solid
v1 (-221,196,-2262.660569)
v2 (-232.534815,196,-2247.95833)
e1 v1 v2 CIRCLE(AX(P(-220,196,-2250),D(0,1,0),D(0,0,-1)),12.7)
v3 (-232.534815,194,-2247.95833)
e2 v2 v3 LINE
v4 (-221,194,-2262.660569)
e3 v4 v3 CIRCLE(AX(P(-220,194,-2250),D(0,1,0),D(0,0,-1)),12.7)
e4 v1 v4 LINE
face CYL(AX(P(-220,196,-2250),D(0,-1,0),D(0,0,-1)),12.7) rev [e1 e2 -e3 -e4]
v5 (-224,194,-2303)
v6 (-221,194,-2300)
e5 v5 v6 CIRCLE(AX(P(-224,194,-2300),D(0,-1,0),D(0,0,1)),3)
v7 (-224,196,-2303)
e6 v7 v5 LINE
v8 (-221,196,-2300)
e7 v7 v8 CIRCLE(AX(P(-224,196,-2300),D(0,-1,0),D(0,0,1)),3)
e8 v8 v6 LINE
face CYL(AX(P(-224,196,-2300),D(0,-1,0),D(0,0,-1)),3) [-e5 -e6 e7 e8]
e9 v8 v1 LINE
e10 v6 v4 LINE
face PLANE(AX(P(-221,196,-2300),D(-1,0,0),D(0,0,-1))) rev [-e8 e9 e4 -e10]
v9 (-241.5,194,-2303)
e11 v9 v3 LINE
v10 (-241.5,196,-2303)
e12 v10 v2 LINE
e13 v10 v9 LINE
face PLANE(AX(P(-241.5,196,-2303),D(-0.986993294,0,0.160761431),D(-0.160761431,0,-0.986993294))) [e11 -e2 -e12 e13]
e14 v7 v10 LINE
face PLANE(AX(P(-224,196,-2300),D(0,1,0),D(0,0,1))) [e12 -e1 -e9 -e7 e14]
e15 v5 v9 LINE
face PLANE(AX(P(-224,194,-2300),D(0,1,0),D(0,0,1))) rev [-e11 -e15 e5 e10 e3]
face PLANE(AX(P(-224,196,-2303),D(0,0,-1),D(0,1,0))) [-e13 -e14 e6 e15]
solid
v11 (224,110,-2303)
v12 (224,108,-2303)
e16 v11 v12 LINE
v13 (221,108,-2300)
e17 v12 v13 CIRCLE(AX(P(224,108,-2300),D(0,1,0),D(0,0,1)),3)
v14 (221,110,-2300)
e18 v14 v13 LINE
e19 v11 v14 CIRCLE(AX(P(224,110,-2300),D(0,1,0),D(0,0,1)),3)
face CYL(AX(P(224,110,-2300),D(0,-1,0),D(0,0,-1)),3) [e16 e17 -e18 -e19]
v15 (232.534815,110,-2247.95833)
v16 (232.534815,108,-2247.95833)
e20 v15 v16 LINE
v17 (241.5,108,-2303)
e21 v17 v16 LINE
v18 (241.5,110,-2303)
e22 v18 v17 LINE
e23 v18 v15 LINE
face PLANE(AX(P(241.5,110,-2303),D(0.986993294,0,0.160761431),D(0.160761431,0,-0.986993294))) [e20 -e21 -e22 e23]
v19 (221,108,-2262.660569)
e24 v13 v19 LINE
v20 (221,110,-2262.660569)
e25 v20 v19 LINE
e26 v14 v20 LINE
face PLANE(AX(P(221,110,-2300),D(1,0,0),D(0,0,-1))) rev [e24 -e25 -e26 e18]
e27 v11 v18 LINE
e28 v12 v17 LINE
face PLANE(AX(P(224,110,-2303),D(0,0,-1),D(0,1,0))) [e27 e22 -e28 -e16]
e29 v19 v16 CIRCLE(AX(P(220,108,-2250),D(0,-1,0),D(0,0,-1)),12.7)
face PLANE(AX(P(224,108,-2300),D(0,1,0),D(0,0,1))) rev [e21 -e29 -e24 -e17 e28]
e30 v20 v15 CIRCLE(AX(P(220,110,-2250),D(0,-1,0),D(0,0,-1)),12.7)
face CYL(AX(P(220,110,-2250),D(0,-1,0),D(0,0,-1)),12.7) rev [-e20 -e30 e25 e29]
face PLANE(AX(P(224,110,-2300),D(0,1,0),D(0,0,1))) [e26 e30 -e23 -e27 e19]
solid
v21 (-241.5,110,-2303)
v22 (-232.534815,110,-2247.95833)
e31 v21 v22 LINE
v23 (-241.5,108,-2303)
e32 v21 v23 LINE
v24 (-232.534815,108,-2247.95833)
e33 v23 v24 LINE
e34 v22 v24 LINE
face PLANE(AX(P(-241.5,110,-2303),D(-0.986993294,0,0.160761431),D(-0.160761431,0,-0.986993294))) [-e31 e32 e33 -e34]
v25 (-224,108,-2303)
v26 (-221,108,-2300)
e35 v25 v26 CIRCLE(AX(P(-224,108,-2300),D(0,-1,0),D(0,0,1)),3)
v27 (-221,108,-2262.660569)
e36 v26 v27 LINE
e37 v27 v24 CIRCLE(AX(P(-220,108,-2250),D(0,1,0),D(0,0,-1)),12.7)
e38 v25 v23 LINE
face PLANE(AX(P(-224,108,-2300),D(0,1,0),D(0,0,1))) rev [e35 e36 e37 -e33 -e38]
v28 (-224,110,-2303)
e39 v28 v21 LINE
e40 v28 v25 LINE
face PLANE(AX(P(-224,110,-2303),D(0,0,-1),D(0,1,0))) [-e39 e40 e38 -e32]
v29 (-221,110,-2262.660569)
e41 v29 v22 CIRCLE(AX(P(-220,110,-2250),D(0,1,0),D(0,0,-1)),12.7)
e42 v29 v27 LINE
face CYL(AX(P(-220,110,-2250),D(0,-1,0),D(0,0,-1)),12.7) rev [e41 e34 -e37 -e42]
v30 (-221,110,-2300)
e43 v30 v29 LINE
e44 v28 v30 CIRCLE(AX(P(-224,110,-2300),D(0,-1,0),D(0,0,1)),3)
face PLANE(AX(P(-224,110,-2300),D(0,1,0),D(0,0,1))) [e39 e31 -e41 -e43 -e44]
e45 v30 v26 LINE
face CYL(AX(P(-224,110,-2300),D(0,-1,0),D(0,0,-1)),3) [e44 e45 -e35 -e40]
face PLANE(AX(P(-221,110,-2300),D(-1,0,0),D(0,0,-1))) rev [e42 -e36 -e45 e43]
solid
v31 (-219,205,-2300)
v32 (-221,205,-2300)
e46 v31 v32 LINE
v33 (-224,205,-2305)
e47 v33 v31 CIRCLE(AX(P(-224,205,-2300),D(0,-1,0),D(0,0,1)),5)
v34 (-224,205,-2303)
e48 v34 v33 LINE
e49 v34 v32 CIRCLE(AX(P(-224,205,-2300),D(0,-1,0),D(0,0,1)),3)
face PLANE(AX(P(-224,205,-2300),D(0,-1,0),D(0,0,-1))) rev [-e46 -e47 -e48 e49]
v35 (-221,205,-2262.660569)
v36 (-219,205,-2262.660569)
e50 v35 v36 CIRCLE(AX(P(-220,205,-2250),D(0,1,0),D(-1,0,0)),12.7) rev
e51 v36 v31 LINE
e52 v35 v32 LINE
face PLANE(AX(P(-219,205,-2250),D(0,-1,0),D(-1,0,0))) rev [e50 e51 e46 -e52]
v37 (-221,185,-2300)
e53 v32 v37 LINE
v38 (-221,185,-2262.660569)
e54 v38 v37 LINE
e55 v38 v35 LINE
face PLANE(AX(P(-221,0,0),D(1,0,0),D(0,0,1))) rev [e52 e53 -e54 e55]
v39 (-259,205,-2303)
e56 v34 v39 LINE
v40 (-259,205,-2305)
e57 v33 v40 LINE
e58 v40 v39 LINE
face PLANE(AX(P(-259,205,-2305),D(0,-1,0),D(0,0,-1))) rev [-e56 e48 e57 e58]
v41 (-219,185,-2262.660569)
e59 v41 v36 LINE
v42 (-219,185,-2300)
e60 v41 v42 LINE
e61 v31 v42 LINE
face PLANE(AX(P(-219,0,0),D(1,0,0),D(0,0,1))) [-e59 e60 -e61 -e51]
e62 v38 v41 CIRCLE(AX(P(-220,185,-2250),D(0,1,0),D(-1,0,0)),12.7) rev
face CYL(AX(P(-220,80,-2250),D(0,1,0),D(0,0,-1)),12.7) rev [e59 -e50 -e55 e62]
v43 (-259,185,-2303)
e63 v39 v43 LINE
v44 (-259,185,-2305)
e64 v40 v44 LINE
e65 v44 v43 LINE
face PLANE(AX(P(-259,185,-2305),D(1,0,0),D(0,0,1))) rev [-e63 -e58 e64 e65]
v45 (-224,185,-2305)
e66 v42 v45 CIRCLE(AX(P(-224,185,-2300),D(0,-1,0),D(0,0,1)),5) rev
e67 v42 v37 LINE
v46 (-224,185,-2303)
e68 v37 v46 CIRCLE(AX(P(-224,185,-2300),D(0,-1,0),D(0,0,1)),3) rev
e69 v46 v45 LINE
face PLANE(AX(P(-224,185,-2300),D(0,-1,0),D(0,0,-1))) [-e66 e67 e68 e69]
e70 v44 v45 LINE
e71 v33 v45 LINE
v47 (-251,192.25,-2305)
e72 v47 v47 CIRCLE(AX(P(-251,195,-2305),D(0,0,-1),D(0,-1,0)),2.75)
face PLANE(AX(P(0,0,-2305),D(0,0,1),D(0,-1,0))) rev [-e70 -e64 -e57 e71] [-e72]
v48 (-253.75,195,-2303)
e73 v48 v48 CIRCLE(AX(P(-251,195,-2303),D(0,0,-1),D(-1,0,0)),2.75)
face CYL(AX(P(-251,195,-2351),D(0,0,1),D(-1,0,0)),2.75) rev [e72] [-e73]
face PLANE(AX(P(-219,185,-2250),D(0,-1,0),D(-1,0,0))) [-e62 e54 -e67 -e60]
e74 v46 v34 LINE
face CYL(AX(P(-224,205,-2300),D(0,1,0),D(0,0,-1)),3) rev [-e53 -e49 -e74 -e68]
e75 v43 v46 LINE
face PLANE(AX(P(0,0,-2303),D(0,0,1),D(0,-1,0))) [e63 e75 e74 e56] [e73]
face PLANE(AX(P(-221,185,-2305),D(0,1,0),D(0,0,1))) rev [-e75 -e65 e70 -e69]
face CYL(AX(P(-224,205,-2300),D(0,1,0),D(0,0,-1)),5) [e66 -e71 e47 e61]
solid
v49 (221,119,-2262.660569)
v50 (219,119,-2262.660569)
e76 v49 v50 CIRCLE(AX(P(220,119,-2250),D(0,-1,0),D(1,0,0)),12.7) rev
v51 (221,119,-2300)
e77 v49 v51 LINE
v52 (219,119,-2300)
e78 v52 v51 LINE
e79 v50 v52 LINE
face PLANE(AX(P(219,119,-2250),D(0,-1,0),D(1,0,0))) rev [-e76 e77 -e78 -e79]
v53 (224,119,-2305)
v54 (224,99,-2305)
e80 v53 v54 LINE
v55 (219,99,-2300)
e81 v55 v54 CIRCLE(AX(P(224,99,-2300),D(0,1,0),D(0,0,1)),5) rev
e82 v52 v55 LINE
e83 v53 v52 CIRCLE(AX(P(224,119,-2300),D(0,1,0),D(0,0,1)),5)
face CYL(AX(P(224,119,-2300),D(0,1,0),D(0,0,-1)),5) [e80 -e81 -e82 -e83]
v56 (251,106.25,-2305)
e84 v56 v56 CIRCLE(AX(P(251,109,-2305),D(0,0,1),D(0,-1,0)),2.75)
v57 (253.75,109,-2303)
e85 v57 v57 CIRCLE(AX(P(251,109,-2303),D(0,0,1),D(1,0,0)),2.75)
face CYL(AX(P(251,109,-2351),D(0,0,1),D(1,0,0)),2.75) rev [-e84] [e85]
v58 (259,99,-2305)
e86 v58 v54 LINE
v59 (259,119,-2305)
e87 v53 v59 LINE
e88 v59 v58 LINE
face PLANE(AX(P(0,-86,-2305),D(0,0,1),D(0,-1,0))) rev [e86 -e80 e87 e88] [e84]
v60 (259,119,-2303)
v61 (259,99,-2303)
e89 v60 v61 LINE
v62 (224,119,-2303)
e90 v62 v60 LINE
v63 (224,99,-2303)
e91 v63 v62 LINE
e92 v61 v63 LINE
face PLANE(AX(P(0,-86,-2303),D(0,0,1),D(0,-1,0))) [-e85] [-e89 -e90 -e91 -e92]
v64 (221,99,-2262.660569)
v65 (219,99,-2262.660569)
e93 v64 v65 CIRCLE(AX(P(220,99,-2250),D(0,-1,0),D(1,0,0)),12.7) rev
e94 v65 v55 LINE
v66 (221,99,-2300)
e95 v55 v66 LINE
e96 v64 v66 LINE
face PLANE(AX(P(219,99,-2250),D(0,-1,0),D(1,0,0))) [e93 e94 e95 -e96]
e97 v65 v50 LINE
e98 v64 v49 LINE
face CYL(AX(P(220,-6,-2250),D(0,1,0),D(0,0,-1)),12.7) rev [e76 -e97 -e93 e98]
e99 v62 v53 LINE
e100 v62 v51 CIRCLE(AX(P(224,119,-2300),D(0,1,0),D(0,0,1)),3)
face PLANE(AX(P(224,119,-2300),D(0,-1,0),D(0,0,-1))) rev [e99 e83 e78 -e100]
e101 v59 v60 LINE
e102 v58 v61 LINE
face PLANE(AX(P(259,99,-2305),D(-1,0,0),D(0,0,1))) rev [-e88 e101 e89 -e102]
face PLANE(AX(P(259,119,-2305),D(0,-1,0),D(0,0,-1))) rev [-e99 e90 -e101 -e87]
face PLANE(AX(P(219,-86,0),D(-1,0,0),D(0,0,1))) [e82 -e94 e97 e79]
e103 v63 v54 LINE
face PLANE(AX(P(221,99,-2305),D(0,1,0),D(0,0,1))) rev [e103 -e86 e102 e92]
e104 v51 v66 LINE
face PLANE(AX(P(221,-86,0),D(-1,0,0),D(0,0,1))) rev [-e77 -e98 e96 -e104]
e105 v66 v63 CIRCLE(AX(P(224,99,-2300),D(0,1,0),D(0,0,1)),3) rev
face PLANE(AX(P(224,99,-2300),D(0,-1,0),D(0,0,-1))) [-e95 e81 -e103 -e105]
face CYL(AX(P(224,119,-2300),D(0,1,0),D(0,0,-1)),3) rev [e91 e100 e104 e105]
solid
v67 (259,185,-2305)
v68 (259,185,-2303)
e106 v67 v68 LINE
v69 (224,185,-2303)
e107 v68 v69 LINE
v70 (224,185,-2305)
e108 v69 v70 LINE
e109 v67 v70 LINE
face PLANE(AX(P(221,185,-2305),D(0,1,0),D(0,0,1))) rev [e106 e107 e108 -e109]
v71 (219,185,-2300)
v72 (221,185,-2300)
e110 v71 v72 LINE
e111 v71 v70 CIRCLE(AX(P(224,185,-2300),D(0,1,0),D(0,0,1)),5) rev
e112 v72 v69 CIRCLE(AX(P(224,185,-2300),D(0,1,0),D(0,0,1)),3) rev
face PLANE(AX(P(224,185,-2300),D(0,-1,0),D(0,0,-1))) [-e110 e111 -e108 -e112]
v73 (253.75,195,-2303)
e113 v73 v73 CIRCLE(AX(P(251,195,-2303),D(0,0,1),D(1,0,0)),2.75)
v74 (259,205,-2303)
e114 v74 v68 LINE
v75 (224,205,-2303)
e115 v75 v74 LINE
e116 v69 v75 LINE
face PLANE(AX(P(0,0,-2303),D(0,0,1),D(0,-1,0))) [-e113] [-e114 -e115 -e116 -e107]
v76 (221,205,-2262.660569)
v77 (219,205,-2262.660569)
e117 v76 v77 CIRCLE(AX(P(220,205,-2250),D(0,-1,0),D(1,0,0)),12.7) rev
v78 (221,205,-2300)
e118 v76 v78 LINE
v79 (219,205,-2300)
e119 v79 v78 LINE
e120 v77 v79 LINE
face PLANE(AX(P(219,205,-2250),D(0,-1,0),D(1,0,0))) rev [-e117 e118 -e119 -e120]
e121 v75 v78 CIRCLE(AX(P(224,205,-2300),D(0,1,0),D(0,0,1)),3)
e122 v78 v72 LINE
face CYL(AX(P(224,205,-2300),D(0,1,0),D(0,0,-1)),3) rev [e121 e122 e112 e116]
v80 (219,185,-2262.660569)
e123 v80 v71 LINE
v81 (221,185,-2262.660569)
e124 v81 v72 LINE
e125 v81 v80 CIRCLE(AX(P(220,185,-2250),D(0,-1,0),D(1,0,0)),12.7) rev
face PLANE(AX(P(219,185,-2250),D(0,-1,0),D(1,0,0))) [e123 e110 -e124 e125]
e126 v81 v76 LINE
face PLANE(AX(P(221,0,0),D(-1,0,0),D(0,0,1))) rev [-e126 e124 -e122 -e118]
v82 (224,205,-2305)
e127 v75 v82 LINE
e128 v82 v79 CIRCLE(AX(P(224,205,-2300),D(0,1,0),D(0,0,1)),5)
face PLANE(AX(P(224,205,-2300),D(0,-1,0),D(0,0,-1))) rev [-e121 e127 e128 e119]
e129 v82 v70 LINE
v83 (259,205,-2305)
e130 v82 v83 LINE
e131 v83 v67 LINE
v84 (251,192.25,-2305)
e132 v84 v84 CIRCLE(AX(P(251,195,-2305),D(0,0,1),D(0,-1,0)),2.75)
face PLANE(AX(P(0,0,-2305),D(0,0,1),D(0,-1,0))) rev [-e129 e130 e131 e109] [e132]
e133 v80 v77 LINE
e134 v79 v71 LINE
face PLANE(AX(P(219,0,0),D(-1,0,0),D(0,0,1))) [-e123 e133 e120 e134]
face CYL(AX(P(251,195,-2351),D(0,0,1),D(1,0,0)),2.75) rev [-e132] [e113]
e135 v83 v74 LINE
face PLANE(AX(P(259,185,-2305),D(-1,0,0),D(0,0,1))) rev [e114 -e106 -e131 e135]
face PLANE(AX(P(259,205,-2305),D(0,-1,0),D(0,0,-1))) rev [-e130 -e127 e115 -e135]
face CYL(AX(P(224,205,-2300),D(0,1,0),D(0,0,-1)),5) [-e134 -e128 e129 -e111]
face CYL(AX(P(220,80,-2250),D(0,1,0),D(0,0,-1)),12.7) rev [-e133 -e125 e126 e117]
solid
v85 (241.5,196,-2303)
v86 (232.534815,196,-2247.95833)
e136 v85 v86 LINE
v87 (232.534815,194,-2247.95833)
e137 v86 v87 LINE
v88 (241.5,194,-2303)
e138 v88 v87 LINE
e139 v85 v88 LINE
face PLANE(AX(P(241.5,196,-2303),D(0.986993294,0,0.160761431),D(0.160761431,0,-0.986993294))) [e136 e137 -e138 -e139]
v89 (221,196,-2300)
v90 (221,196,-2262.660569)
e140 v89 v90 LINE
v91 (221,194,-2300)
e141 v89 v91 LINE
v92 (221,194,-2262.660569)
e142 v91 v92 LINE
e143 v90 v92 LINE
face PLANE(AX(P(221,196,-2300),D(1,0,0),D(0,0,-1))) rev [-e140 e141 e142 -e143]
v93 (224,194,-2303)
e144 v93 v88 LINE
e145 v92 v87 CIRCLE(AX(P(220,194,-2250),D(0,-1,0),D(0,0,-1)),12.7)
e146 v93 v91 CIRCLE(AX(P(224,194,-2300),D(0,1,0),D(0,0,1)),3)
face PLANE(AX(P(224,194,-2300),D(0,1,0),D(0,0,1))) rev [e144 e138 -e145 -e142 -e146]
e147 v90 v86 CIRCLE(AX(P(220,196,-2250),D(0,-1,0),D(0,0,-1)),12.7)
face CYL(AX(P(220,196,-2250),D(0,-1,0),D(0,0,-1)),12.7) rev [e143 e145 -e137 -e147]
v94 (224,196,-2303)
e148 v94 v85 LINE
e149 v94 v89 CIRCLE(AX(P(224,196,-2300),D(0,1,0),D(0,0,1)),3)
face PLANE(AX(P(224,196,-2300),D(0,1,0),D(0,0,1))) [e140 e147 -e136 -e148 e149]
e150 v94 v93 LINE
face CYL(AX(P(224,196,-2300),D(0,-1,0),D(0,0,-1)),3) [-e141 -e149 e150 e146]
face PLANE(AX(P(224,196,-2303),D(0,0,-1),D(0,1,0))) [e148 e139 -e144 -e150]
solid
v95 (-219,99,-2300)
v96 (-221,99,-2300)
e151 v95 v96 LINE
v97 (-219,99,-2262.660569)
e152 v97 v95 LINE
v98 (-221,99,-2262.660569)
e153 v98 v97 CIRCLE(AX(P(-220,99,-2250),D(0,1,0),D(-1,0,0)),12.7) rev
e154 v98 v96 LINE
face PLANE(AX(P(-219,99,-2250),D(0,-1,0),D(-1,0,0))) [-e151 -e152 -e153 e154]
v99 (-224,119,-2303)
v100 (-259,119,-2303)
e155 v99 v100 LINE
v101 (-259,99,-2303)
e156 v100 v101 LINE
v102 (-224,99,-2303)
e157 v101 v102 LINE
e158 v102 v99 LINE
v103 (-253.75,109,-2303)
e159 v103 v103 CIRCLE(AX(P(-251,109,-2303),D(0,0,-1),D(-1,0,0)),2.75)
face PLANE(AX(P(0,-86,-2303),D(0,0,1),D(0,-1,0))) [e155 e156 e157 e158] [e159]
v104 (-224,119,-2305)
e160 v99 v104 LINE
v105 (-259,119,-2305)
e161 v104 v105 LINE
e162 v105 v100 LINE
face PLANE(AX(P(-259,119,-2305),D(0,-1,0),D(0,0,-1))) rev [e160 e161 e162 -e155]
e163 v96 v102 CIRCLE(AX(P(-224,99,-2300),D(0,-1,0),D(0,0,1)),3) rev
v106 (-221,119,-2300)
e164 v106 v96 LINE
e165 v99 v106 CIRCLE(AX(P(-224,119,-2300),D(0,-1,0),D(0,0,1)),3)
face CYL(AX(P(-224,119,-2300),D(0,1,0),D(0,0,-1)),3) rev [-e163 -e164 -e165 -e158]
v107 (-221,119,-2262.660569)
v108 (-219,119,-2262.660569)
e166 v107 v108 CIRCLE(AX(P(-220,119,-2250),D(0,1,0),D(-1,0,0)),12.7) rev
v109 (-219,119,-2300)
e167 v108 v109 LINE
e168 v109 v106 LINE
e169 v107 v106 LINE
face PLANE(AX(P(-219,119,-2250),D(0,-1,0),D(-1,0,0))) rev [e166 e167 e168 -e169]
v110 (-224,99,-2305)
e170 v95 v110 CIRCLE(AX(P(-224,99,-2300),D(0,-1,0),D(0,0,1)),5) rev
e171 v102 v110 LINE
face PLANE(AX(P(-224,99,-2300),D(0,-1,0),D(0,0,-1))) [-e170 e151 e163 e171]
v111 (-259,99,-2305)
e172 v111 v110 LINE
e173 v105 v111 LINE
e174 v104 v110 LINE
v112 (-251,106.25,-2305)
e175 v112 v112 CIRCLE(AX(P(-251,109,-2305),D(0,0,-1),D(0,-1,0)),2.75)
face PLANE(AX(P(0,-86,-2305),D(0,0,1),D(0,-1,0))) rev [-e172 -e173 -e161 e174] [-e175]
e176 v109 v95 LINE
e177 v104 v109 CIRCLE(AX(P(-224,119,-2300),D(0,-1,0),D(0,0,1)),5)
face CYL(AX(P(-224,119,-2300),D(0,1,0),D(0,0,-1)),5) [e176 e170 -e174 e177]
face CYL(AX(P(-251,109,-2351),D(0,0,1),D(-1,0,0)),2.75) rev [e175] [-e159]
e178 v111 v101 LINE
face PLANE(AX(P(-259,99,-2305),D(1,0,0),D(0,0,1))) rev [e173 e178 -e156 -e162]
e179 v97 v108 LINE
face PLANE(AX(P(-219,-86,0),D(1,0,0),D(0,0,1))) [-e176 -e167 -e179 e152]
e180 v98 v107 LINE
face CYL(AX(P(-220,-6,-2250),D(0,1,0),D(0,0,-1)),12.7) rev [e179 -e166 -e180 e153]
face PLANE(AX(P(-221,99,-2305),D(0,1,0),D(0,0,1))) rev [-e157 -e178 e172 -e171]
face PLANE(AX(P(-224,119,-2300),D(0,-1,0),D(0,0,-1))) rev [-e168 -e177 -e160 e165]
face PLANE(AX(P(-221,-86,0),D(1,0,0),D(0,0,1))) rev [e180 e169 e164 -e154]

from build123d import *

# Parameters (mm, degrees)
SKETCH3_W                = 50
SKETCH3_H                = 20
BASE_FLANGE1_DEPTH       = 2
EDGE_FLANGE1_DEPTH       = 20
BOSS_EXTRUDE2_DEPTH      = 1
SKETCH19_R               = 2.75
CUT_EXTRUDE1_DEPTH       = 48
INDENT1_START            = 185
INDENT1_DEPTH            = 20
BODY_DELETE_KEEP_START   = 185
BODY_DELETE_KEEP_1_DEPTH = 20
LPATTERN1_COUNT          = 2
LPATTERN1_PITCH          = 86


# Read off the part's stored shape, not the designer's step: Indent1, Body-Delete/Keep 1
# Sheet-metal steps are written as plain solids
with BuildPart() as part:
    # Sketch3 → Base-Flange1 (new body)
    with BuildSketch(Plane(origin=(221, 0, 0), x_dir=(0, 0, -1), z_dir=(1, 0, 0))):
        with Locations((2275, 195)):
            Rectangle(SKETCH3_W, SKETCH3_H)
    extrude(amount=-BASE_FLANGE1_DEPTH)

    # Edge-Flange1 section (across the edge) → Edge-Flange1 (add)
    with BuildSketch(Plane(origin=(221, 185, -2303), x_dir=(0, 0, 1), z_dir=(0, 1, 0))):
        with BuildLine():
            Line((-2, 3), (-2, 38))
            Line((-2, 38), (0, 38))
            Line((0, 38), (0, 3))
            ThreePointArc((0, 3), (0.878679656, 0.878679656), (3, 0))
            Line((3, 0), (3, -2))
            ThreePointArc((3, -2), (-0.535533906, -0.535533906), (-2, 3))
        make_face()
    extrude(amount=EDGE_FLANGE1_DEPTH)

    # Sketch19 → Cut-Extrude1 (cut)
    with BuildSketch(Plane.XY.offset(-2303)):
        with Locations((251, 195)):
            Circle(SKETCH19_R)
    extrude(amount=-CUT_EXTRUDE1_DEPTH, mode=Mode.SUBTRACT)

    # Indent1 outline → Indent1 (cut)
    with BuildSketch(Plane(origin=(0, 0, 0), x_dir=(1, 0, 0), z_dir=(0, 1, 0)).offset(INDENT1_START)):
        with BuildLine():
            Line((221, 2261.356055653), (221, 2262.660568708))
            ThreePointArc((221, 2262.660568708), (220, 2262.7), (219, 2262.660568708))
            Line((219, 2262.660568708), (219, 2261.356055653))
            ThreePointArc((219, 2261.356055653), (220, 2261.4), (221, 2261.356055653))
        make_face()
    extrude(amount=INDENT1_DEPTH, mode=Mode.SUBTRACT)

    # Body-Delete/Keep 1 outline → Body-Delete/Keep 1 (cut)
    with BuildSketch(Plane(origin=(0, 0, 0), x_dir=(1, 0, 0), z_dir=(0, 1, 0)).offset(BODY_DELETE_KEEP_START)):
        with BuildLine():
            ThreePointArc((221, 2261.356055653), (220, 2261.4), (219, 2261.356055653))
            Line((219, 2261.356055653), (219, 2250))
            Line((219, 2250), (221, 2250))
            Line((221, 2250), (221, 2261.356055653))
        make_face()
    extrude(amount=BODY_DELETE_KEEP_1_DEPTH, mode=Mode.SUBTRACT)


with BuildPart() as body_2:
    # Sketch11 → Boss-Extrude2 (new, symmetric)
    with BuildSketch(Plane(origin=(0, 195, 0), x_dir=(1, 0, 0), z_dir=(0, 1, 0))):
        with BuildLine():
            Line((221, 2300), (221, 2262.660568708))
            ThreePointArc((221, 2262.660568708), (229.991834673, 2257.839211686), (232.534814834, 2247.958329831))
            Line((232.534814834, 2247.958329831), (241.5, 2303))
            Line((241.5, 2303), (224, 2303))
            ThreePointArc((224, 2303), (221.878679656, 2302.121320344), (221, 2300))
        make_face()
    extrude(amount=BOSS_EXTRUDE2_DEPTH, both=True)


with BuildPart() as lpattern1_1:
    # LPattern1: pattern copy
    add(part.part.moved(Location(Vector(0, -1, 0) * (1 * LPATTERN1_PITCH))))


with BuildPart() as lpattern1_2:
    # LPattern1: pattern copy
    add(body_2.part.moved(Location(Vector(0, -1, 0) * (1 * LPATTERN1_PITCH))))


with BuildPart() as body_5:
    # Mirror1: mirrored copy
    add(part.part.mirror(Plane(origin=(0, 0, 0), x_dir=(0, 0, 1), z_dir=(1, 0, 0))))


with BuildPart() as body_6:
    # Mirror1 2: mirrored copy
    add(body_2.part.mirror(Plane(origin=(0, 0, 0), x_dir=(0, 0, 1), z_dir=(1, 0, 0))))


with BuildPart() as body_7:
    # Mirror1 3: mirrored copy
    add(lpattern1_1.part.mirror(Plane(origin=(0, 0, 0), x_dir=(0, 0, 1), z_dir=(1, 0, 0))))


with BuildPart() as body_8:
    # Mirror1 4: mirrored copy
    add(lpattern1_2.part.mirror(Plane(origin=(0, 0, 0), x_dir=(0, 0, 1), z_dir=(1, 0, 0))))


solid = Compound([part.part, body_2.part, lpattern1_1.part, lpattern1_2.part, body_5.part, body_6.part, body_7.part, body_8.part])
